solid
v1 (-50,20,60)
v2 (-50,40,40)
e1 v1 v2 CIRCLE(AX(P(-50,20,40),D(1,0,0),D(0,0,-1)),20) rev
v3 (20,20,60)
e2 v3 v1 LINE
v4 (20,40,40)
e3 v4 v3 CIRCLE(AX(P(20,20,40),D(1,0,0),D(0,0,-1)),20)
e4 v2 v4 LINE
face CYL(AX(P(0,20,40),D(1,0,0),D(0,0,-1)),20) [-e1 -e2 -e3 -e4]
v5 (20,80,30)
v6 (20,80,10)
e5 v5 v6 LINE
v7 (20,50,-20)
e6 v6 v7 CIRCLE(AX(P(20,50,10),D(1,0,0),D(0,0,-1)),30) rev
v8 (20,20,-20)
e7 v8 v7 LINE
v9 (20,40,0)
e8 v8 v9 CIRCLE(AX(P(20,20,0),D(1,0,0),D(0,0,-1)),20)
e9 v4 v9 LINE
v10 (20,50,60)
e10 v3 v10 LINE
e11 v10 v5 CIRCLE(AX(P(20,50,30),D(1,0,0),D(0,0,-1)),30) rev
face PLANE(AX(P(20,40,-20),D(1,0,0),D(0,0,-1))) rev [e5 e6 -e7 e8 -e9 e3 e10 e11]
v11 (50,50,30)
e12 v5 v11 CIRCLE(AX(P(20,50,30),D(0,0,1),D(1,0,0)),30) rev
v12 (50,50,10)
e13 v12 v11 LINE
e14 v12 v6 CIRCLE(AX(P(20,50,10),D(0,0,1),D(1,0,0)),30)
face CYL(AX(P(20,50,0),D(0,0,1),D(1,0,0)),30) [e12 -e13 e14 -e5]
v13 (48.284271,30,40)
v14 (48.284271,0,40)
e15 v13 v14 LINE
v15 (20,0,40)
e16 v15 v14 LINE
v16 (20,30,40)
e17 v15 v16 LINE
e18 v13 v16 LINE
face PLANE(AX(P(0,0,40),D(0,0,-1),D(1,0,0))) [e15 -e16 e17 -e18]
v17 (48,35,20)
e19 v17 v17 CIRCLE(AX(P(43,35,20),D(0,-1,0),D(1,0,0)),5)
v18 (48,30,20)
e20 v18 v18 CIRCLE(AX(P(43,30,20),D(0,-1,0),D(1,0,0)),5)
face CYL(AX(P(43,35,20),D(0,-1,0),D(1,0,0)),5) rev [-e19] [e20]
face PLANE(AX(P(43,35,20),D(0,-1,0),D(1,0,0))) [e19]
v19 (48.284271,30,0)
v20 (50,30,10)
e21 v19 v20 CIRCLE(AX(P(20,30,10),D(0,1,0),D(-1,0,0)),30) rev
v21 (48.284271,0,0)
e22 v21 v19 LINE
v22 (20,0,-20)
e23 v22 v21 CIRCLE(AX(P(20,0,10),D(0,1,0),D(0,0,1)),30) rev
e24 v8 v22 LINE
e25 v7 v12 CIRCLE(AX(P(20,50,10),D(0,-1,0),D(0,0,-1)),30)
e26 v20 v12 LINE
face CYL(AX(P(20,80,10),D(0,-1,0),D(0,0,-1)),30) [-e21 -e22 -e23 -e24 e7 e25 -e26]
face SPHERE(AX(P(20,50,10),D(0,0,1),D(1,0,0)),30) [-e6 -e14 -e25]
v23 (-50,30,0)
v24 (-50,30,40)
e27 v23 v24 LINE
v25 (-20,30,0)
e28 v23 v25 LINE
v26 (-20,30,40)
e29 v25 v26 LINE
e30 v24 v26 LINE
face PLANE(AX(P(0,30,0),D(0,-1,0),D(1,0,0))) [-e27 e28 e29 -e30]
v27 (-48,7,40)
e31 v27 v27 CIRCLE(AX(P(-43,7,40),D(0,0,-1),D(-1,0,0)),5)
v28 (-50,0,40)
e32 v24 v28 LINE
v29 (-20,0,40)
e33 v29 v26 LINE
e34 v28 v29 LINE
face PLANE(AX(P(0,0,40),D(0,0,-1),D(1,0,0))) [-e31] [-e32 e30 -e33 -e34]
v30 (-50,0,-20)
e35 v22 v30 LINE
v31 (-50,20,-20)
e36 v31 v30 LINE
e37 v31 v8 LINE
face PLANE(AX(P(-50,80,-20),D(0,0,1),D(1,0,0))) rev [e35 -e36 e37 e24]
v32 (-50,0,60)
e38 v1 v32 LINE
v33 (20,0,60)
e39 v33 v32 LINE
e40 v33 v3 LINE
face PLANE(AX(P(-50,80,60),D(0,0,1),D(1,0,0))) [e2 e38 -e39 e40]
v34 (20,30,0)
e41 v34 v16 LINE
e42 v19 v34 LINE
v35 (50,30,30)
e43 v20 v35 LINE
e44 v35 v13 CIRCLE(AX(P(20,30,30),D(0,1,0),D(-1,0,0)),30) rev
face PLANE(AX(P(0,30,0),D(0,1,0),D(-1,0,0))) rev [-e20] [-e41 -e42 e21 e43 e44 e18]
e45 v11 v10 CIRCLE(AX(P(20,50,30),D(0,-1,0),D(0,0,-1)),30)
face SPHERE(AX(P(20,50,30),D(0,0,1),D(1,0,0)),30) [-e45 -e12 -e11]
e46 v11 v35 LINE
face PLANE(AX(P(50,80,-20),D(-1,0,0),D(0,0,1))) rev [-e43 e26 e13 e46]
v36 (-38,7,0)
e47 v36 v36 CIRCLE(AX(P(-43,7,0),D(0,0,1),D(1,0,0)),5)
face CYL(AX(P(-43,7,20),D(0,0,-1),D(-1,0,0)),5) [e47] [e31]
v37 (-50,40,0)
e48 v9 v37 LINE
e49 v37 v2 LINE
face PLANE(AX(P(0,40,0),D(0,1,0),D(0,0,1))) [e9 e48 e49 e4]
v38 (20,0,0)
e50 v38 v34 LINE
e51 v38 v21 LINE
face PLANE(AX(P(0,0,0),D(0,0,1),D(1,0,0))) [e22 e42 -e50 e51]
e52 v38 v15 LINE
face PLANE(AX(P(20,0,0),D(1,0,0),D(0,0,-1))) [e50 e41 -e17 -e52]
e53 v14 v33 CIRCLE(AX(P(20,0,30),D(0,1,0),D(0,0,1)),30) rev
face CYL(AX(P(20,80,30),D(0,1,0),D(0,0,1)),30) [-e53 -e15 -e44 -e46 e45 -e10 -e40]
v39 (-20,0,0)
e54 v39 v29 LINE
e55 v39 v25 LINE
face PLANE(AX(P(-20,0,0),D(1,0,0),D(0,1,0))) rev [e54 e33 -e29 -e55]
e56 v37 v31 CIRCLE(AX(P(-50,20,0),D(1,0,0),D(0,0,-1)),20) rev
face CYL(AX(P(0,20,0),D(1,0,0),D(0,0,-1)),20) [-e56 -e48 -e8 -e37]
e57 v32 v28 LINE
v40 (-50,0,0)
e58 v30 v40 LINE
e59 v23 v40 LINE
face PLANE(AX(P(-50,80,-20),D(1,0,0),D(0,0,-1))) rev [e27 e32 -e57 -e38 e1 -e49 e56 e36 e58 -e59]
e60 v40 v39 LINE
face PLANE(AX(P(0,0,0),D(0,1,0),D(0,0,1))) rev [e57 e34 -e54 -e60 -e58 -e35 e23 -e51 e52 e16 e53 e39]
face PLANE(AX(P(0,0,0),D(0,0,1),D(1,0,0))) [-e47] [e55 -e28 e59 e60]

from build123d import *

# Parameters (mm, degrees)
SKETCH_1_W          = 100
SKETCH_1_H          = 40
EXTRUDE_1_DEPTH     = 80
SKETCH_3_W          = 30
SKETCH_3_H          = 30
CUT_EXTRUDE_2_DEPTH = 20
SKETCH_6_R          = 5
EXTRUDE_2_DEPTH     = 20
SKETCH_7_W          = 70
SKETCH_7_H          = 80
CUT_EXTRUDE_3_DEPTH = 40
FILLET_1_R          = 30
FILLET_2_R          = 30
FILLET_3_R          = 30
FILLET_4_R          = 20
FILLET_5_R          = 20
SKETCH1_R           = 5
CUT_EXTRUDE1_DEPTH  = 5


with BuildPart() as part:
    # 草圖1 → 填料-伸長1 (new body)
    with BuildSketch(Plane(origin=(0, 0, 0), x_dir=(1, 0, 0), z_dir=(0, 1, 0))):
        Rectangle(SKETCH_1_W, SKETCH_1_H)
    extrude_1 = extrude(amount=EXTRUDE_1_DEPTH)

    # 草圖3 → 除料-伸長2 (cut)
    with BuildSketch(Plane.XY.offset(20)):
        with Locations((-35, 15)):
            Rectangle(SKETCH_3_W, SKETCH_3_H)
        with Locations((35, 15)):
            Rectangle(SKETCH_3_W, SKETCH_3_H)
    cut_extrude_2 = extrude(amount=-CUT_EXTRUDE_2_DEPTH, mode=Mode.SUBTRACT)

    # 草圖6 → 填料-伸長2 (add)
    with BuildSketch(Plane.XY):
        with Locations((-43, 7)):
            Circle(SKETCH_6_R)
    extrude_2 = extrude(amount=EXTRUDE_2_DEPTH)

    # 鏡射3: 填料-伸長1, 除料-伸長2, 填料-伸長2 across plane
    add(extrude_1.mirror(Plane(origin=(-50, 80, 20), x_dir=(1, 0, 0), z_dir=(0, 0, -1))))
    add(cut_extrude_2.mirror(Plane(origin=(-50, 80, 20), x_dir=(1, 0, 0), z_dir=(0, 0, -1))), mode=Mode.SUBTRACT)
    add(extrude_2.mirror(Plane(origin=(-50, 80, 20), x_dir=(1, 0, 0), z_dir=(0, 0, -1))))

    # 草圖7 → 除料-伸長3 (cut)
    with BuildSketch(Plane(origin=(0, 80, 0), x_dir=(1, 0, 0), z_dir=(0, 1, 0))):
        with Locations((-15, -20)):
            Rectangle(SKETCH_7_W, SKETCH_7_H)
    extrude(amount=-CUT_EXTRUDE_3_DEPTH, mode=Mode.SUBTRACT)

    # 圓角1
    fillet_1_edges = [part.edges().sort_by_distance(p)[0] for p in [
        (50, 80, 20),
    ]]
    fillet(fillet_1_edges, radius=FILLET_1_R - 0.0001)  # a hair under: the kernel refuses the full size

    # 圓角2
    fillet_2_edges = [part.edges().sort_by_distance(p)[0] for p in [
        (50, 25.00005, 60),
        (41.213232725, 71.213232725, 60),
    ]]
    fillet(fillet_2_edges, radius=FILLET_2_R - 0.0001)  # a hair under: the kernel refuses the full size

    # 圓角3
    fillet_3_edges = [part.edges().sort_by_distance(p)[0] for p in [
        (50, 25.00005, -20),
        (41.213232725, 71.213232725, -20),
    ]]
    fillet(fillet_3_edges, radius=FILLET_3_R - 0.0001)  # a hair under: the kernel refuses the full size

    # 圓角4
    fillet_4_edges = [part.edges().sort_by_distance(p)[0] for p in [
        (-15, 40, 60),
    ]]
    fillet(fillet_4_edges, radius=FILLET_4_R)

    # 圓角5
    fillet_5_edges = [part.edges().sort_by_distance(p)[0] for p in [
        (-15, 40, -20),
    ]]
    fillet(fillet_5_edges, radius=FILLET_5_R)

    # Sketch1 → Cut-Extrude1 (cut)
    with BuildSketch(Plane.XZ.offset(-30)):
        with Locations((43, 20)):
            Circle(SKETCH1_R)
    extrude(amount=-CUT_EXTRUDE1_DEPTH, mode=Mode.SUBTRACT)


solid = part.part
